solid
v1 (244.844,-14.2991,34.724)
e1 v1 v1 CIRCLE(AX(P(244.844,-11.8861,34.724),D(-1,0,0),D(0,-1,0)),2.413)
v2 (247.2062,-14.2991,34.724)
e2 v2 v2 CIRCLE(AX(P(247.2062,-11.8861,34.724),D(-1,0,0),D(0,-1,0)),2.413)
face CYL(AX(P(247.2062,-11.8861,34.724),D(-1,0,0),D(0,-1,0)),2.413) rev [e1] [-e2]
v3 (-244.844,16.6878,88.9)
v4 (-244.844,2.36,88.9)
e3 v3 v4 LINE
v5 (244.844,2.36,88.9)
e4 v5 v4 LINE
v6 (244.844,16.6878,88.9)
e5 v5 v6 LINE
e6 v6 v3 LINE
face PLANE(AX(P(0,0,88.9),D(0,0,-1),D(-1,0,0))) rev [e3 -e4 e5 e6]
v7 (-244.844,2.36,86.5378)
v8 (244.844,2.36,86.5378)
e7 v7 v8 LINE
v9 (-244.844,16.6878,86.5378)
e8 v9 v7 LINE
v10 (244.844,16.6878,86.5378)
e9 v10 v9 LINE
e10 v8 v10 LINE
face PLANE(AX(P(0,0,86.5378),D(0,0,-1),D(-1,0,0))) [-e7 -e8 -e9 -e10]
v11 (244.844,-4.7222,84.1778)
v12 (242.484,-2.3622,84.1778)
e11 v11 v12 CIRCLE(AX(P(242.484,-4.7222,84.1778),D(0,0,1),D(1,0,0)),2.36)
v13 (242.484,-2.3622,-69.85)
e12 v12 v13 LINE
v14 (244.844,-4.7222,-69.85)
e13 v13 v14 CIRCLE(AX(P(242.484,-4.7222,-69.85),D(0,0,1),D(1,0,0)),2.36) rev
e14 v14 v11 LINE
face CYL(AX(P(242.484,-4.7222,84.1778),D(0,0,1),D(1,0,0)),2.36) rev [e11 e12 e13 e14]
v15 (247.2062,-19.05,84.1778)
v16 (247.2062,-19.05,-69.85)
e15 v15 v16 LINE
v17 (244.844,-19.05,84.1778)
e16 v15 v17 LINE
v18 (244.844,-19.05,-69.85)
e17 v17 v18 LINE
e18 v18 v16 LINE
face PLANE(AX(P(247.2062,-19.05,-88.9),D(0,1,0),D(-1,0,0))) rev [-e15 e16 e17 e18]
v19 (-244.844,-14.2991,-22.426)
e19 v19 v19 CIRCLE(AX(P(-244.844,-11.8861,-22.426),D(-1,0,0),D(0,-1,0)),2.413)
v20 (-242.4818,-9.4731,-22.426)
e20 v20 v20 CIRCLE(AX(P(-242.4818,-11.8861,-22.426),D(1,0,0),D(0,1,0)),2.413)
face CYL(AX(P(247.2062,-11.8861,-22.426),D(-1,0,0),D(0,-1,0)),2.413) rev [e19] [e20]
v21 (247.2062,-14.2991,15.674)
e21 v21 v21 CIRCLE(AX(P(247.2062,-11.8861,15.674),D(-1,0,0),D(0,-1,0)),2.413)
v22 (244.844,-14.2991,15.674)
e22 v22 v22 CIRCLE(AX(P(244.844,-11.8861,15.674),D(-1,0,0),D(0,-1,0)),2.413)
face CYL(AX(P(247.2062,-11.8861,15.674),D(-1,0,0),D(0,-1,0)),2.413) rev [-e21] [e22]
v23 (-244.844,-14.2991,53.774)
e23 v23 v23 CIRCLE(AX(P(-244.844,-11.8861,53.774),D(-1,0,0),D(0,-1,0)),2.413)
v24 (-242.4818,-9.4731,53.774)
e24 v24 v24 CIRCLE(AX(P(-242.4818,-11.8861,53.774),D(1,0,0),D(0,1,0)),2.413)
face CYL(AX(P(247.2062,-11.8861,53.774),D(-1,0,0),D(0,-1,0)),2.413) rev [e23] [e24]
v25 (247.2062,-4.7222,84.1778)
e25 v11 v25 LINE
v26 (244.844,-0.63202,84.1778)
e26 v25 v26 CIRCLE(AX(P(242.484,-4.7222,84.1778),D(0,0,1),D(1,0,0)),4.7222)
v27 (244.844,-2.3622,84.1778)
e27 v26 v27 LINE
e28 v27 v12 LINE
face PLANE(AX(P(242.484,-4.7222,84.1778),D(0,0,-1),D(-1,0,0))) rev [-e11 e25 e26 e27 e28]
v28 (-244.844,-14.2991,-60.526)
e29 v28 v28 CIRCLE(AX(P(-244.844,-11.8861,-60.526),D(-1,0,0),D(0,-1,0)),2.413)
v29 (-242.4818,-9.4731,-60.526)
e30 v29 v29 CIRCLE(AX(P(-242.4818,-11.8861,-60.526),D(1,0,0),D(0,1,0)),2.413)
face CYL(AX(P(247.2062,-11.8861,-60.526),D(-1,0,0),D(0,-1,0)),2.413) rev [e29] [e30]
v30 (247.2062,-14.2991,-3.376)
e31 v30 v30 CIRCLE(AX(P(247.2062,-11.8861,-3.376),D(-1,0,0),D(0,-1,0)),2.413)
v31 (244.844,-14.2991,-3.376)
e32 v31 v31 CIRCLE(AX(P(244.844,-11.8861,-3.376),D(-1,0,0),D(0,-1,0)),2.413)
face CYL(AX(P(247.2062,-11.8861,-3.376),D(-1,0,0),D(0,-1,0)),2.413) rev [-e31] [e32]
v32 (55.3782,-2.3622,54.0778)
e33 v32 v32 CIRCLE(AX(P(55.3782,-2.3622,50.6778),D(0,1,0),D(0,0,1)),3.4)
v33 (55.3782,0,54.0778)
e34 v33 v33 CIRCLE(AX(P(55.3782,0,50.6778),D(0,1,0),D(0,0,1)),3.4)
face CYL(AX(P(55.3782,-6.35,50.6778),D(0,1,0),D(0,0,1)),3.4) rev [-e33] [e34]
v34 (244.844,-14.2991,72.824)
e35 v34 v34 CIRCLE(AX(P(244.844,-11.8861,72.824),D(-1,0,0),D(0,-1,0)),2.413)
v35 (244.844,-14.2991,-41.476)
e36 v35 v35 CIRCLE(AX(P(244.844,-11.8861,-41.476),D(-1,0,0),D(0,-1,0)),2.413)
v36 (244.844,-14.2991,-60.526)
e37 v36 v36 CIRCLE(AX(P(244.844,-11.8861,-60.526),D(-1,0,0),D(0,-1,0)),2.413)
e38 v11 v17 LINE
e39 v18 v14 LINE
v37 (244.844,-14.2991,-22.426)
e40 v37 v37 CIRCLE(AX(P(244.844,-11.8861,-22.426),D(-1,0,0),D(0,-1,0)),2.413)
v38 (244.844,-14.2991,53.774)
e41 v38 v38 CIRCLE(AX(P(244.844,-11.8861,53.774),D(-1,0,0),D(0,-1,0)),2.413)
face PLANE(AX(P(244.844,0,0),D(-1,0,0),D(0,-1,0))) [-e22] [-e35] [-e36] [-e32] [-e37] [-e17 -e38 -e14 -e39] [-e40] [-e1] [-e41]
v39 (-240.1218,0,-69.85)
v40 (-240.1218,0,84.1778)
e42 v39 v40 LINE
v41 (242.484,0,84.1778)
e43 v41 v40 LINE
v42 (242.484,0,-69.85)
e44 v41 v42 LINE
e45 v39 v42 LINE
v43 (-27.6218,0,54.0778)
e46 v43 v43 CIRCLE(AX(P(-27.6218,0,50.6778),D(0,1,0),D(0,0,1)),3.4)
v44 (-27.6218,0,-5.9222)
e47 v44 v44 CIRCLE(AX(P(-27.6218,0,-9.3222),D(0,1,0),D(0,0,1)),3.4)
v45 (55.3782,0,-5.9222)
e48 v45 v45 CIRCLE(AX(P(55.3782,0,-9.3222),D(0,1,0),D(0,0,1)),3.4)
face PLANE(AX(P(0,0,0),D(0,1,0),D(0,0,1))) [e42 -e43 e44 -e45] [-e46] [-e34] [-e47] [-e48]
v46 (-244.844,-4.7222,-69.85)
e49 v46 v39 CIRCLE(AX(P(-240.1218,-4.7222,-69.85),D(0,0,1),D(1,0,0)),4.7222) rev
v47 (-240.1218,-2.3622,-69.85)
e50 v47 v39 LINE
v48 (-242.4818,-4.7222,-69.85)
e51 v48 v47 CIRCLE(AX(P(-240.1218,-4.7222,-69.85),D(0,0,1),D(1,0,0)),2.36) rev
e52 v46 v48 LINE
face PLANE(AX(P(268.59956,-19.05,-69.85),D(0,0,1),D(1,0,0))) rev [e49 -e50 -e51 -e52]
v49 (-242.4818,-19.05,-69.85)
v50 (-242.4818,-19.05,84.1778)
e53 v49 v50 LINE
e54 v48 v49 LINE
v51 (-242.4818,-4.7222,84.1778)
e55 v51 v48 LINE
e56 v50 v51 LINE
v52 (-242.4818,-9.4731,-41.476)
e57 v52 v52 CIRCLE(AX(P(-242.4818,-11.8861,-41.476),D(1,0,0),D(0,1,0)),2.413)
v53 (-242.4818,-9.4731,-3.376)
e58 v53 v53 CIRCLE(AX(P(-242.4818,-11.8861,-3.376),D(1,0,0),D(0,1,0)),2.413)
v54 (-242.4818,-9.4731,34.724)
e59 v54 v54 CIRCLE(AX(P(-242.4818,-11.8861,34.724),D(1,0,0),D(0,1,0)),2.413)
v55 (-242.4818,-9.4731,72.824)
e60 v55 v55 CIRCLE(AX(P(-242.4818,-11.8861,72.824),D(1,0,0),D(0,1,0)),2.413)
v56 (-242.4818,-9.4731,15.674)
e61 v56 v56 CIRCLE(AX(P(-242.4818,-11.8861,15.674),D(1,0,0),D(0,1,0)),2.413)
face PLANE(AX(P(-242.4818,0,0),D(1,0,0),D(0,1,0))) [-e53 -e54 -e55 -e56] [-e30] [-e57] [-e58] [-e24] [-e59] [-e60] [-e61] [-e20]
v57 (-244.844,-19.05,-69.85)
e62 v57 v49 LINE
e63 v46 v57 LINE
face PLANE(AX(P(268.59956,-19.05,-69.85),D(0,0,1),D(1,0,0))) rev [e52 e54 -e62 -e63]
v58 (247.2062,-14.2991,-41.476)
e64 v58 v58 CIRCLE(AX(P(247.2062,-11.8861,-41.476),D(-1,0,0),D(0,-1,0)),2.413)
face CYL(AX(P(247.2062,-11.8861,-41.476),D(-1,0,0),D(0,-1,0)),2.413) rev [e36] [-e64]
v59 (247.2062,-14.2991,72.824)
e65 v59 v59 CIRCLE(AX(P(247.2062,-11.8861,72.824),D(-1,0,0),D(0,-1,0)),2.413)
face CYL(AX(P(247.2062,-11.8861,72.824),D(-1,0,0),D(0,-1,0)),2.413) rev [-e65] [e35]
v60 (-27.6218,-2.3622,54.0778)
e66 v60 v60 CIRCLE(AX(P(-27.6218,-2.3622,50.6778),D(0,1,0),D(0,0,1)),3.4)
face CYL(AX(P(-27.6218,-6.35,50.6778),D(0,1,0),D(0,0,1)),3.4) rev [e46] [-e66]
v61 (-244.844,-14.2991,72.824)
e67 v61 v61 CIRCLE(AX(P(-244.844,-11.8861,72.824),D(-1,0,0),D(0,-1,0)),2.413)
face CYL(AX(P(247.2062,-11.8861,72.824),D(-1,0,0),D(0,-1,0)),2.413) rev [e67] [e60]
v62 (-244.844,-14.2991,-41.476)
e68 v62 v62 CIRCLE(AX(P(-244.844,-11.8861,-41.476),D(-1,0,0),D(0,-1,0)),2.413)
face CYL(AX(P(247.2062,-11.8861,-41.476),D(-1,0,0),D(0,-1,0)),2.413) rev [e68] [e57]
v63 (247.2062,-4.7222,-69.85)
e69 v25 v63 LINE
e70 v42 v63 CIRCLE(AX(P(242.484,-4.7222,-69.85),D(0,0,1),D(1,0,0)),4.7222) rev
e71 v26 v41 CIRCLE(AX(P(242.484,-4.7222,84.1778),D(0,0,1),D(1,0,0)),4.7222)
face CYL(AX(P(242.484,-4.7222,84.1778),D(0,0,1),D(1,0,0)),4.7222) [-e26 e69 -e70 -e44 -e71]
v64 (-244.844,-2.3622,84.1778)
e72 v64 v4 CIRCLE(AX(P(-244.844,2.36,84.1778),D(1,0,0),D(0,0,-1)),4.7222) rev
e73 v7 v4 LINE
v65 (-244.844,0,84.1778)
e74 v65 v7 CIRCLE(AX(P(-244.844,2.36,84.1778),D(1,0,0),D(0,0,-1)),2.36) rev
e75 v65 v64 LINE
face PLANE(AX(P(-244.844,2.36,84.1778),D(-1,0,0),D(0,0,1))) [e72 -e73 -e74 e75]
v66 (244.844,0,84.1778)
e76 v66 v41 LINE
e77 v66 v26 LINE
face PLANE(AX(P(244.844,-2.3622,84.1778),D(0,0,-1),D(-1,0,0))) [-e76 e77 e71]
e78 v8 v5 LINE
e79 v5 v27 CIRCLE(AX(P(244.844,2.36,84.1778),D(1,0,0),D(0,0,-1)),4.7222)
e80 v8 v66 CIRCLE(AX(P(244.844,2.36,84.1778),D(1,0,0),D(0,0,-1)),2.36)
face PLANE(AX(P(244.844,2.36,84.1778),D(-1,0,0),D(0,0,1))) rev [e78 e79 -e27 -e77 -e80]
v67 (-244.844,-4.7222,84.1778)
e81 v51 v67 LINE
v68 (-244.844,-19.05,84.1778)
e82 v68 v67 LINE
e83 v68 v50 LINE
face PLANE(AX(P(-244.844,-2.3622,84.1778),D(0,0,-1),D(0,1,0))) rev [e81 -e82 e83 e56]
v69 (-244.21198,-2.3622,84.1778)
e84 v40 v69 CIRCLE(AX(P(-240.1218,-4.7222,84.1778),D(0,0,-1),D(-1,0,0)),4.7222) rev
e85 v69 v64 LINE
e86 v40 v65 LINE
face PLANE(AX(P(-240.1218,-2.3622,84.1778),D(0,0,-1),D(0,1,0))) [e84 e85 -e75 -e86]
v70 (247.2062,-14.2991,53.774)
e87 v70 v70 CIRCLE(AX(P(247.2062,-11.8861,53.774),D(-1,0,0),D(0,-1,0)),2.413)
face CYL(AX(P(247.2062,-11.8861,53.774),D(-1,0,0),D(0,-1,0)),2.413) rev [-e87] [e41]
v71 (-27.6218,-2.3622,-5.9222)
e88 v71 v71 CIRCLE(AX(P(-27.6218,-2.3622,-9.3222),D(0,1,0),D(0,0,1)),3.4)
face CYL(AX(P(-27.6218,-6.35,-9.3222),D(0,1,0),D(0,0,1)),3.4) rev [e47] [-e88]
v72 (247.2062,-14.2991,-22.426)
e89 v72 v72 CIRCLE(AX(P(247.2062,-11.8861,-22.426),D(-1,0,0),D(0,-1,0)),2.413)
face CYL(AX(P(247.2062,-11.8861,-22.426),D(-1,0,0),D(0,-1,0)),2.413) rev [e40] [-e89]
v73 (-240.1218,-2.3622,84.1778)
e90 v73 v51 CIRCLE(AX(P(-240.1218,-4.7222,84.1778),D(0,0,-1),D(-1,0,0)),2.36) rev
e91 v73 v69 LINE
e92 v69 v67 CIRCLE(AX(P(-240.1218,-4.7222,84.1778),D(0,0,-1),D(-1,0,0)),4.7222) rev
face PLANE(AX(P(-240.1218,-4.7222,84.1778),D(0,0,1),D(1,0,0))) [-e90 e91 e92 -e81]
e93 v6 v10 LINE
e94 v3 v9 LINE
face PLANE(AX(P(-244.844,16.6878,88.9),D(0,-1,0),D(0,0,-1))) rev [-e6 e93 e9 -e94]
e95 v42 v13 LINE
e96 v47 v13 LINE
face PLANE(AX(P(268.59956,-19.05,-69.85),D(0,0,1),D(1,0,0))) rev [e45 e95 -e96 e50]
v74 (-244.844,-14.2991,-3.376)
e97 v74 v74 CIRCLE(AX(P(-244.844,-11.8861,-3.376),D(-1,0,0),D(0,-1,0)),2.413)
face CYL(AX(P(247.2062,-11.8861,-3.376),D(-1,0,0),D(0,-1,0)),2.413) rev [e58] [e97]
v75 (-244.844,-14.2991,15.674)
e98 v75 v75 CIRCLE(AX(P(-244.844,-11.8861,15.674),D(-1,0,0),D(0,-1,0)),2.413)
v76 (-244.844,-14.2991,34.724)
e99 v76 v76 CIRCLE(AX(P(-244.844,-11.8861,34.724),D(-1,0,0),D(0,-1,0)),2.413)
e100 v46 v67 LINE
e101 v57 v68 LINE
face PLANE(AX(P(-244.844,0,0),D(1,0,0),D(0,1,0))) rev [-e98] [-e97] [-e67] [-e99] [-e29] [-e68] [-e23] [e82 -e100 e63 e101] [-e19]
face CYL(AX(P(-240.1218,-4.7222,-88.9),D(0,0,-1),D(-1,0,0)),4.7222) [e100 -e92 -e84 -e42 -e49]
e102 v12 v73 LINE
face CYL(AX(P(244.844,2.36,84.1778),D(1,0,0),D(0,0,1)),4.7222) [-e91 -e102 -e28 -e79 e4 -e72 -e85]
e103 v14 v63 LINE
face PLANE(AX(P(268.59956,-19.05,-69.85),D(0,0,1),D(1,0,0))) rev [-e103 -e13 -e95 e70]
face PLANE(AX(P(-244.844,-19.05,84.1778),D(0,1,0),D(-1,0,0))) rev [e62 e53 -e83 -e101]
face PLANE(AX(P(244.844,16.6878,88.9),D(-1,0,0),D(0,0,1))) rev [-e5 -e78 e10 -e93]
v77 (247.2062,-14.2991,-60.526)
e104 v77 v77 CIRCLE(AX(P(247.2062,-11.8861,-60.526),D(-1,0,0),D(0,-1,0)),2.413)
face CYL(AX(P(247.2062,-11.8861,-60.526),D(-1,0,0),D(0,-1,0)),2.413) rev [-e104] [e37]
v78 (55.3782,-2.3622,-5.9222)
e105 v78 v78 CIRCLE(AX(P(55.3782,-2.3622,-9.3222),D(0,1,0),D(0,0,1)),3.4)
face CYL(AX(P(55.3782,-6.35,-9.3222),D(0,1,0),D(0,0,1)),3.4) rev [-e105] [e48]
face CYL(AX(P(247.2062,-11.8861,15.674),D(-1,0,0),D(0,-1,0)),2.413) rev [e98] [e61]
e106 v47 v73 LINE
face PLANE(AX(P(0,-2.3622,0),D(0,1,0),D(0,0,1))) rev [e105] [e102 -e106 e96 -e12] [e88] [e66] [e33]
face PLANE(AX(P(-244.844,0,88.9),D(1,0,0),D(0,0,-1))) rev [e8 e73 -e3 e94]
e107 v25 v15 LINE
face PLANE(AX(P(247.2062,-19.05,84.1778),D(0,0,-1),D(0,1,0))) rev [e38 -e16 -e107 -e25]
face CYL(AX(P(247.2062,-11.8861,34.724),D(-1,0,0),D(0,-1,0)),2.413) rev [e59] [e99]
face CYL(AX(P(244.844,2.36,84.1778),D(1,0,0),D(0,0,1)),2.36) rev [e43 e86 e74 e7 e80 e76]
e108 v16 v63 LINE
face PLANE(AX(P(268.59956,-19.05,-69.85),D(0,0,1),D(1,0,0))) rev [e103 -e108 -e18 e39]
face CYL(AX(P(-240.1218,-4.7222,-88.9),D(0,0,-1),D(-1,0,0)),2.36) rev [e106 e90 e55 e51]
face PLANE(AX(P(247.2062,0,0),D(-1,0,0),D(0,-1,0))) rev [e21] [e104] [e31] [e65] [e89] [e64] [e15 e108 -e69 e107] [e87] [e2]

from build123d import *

# Parameters (mm, degrees)
SKETCH1_W                    = 489.688000048
SKETCH1_H                    = 177.8
BASE_FLANGE1_DEPTH           = 2.3622
EDGE_FLANGE1_STRIP_W         = 14.1688
EDGE_FLANGE1_STRIP_H         = 2.3622
EDGE_FLANGE1_STRIP_CUT_DEPTH = 489.688000048
EDGE_FLANGE1_DEPTH           = 489.688000048
EDGE_FLANGE2_STRIP_W         = 14.1688
EDGE_FLANGE2_STRIP_H         = 2.3622
EDGE_FLANGE2_STRIP_CUT_DEPTH = 173.0778
EDGE_FLANGE2_DEPTH           = 173.0778
EDGE_FLANGE3_STRIP_W         = 14.1688
EDGE_FLANGE3_STRIP_H         = 2.3622
EDGE_FLANGE3_STRIP_CUT_DEPTH = 173.0778
EDGE_FLANGE3_DEPTH           = 173.0778
SKETCH15_R                   = 3.4
CUT_EXTRUDE1_DEPTH           = 6.35
SKETCH33_W                   = 534.836919658
SKETCH33_H                   = 38.1
CUT_EXTRUDE5_DEPTH           = 264.395174273
SKETCH37_R                   = 2.413
CUT_EXTRUDE8_DEPTH           = 501.379367947


# Sheet-metal steps are written as plain solids
with BuildPart() as part:
    # Sketch1 → Base-Flange1 (new body)
    with BuildSketch(Plane(origin=(0, 0, 0), x_dir=(1, 0, 0), z_dir=(0, 1, 0))):
        Rectangle(SKETCH1_W, SKETCH1_H)
    extrude(amount=-BASE_FLANGE1_DEPTH)

    # Edge-Flange1 strip (across the edge) → Edge-Flange1 strip cut (cut)
    with BuildSketch(Plane(origin=(-244.844000024, 0, 88.9), x_dir=(0, 0, -1), z_dir=(1, 0, 0))):
        with Locations((-2.3622, -1.1811)):
            Rectangle(EDGE_FLANGE1_STRIP_W, EDGE_FLANGE1_STRIP_H)
    extrude(amount=EDGE_FLANGE1_STRIP_CUT_DEPTH, mode=Mode.SUBTRACT)

    # Edge-Flange1 section (across the edge) → Edge-Flange1 (add)
    with BuildSketch(Plane(origin=(-244.844000024, 0, 88.9), x_dir=(0, 0, -1), z_dir=(1, 0, 0))):
        with BuildLine():
            Line((0, 2.36), (0, 16.6878))
            Line((0, 16.6878), (2.3622, 16.6878))
            Line((2.3622, 16.6878), (2.3622, 2.36))
            ThreePointArc((2.3622, 2.36), (3.053427996, 0.691227996), (4.7222, 0))
            Line((4.7222, 0), (4.7222, -2.3622))
            ThreePointArc((4.7222, -2.3622), (1.383100358, -0.979099642), (0, 2.36))
        make_face()
    extrude(amount=EDGE_FLANGE1_DEPTH)

    # Edge-Flange2 strip (across the edge) → Edge-Flange2 strip cut (cut)
    with BuildSketch(Plane(origin=(-244.844000024, -2.3622, 84.1778), x_dir=(1, 0, 0), z_dir=(0, 0, -1))):
        with Locations((-2.3622, -1.1811)):
            Rectangle(EDGE_FLANGE2_STRIP_W, EDGE_FLANGE2_STRIP_H)
    extrude(amount=EDGE_FLANGE2_STRIP_CUT_DEPTH, mode=Mode.SUBTRACT)

    # Edge-Flange2 section (across the edge) → Edge-Flange2 (add)
    with BuildSketch(Plane(origin=(-244.844000024, -2.3622, 84.1778), x_dir=(1, 0, 0), z_dir=(0, 0, -1))):
        with BuildLine():
            Line((0, 2.36), (0, 16.6878))
            Line((0, 16.6878), (2.3622, 16.6878))
            Line((2.3622, 16.6878), (2.3622, 2.36))
            ThreePointArc((2.3622, 2.36), (3.053427996, 0.691227996), (4.7222, 0))
            Line((4.7222, 0), (4.7222, -2.3622))
            ThreePointArc((4.7222, -2.3622), (1.383100358, -0.979099642), (0, 2.36))
        make_face()
    extrude(amount=EDGE_FLANGE2_DEPTH)

    # Edge-Flange3 strip (across the edge) → Edge-Flange3 strip cut (cut)
    with BuildSketch(Plane(origin=(244.844000024, -2.3622, -88.9), x_dir=(-1, 0, 0), z_dir=(0, 0, 1))):
        with Locations((-4.7244, -1.1811)):
            Rectangle(EDGE_FLANGE3_STRIP_W, EDGE_FLANGE3_STRIP_H)
    extrude(amount=EDGE_FLANGE3_STRIP_CUT_DEPTH, mode=Mode.SUBTRACT)

    # Edge-Flange3 section (across the edge) → Edge-Flange3 (add)
    with BuildSketch(Plane(origin=(244.844000024, -2.3622, -88.9), x_dir=(-1, 0, 0), z_dir=(0, 0, 1))):
        with BuildLine():
            Line((-2.3622, 2.36), (-2.3622, 16.6878))
            Line((-2.3622, 16.6878), (0, 16.6878))
            Line((0, 16.6878), (0, 2.36))
            ThreePointArc((0, 2.36), (0.691227996, 0.691227996), (2.36, 0))
            Line((2.36, 0), (2.36, -2.3622))
            ThreePointArc((2.36, -2.3622), (-0.979099642, -0.979099642), (-2.3622, 2.36))
        make_face()
    extrude(amount=EDGE_FLANGE3_DEPTH)

    # Sketch15 → Cut-Extrude1 (cut)
    with BuildSketch(Plane(origin=(0, 0, 0), x_dir=(1, 0, 0), z_dir=(0, 1, 0))):
        with Locations(Location((-27.621800024, 9.3222, 0), (0, 0, 270))):
            Circle(SKETCH15_R)
        with Locations(Location((-27.621800024, -50.6778, 0), (0, 0, 270))):
            Circle(SKETCH15_R)
        with Locations(Location((55.378199976, 9.3222, 0), (0, 0, 270))):
            Circle(SKETCH15_R)
        with Locations(Location((55.378199976, -50.6778, 0), (0, 0, 270))):
            Circle(SKETCH15_R)
    extrude(amount=-CUT_EXTRUDE1_DEPTH, mode=Mode.SUBTRACT)

    # Sketch33 → Cut-Extrude5 (cut, through all)
    with BuildSketch(Plane(origin=(0, 0, 0), x_dir=(1, 0, 0), z_dir=(0, 1, 0))):
        with Locations((1.1811, 88.9)):
            Rectangle(SKETCH33_W, SKETCH33_H)
    extrude(amount=-CUT_EXTRUDE5_DEPTH, mode=Mode.SUBTRACT)

    # Sketch37 → Cut-Extrude8 (cut, through all)
    with BuildSketch(Plane.ZY.offset(244.844000024)):
        with Locations(Location((72.824, -11.8861, 0), (0, 0, 270))):
            Circle(SKETCH37_R)
        with Locations(Location((53.774, -11.8861, 0), (0, 0, 270))):
            Circle(SKETCH37_R)
        with Locations(Location((34.724, -11.8861, 0), (0, 0, 270))):
            Circle(SKETCH37_R)
        with Locations(Location((15.674, -11.8861, 0), (0, 0, 270))):
            Circle(SKETCH37_R)
        with Locations(Location((-3.376, -11.8861, 0), (0, 0, 270))):
            Circle(SKETCH37_R)
        with Locations(Location((-22.426, -11.8861, 0), (0, 0, 270))):
            Circle(SKETCH37_R)
        with Locations(Location((-41.476, -11.8861, 0), (0, 0, 270))):
            Circle(SKETCH37_R)
        with Locations(Location((-60.526, -11.8861, 0), (0, 0, 270))):
            Circle(SKETCH37_R)
    extrude(amount=-CUT_EXTRUDE8_DEPTH, mode=Mode.SUBTRACT)


solid = part.part
